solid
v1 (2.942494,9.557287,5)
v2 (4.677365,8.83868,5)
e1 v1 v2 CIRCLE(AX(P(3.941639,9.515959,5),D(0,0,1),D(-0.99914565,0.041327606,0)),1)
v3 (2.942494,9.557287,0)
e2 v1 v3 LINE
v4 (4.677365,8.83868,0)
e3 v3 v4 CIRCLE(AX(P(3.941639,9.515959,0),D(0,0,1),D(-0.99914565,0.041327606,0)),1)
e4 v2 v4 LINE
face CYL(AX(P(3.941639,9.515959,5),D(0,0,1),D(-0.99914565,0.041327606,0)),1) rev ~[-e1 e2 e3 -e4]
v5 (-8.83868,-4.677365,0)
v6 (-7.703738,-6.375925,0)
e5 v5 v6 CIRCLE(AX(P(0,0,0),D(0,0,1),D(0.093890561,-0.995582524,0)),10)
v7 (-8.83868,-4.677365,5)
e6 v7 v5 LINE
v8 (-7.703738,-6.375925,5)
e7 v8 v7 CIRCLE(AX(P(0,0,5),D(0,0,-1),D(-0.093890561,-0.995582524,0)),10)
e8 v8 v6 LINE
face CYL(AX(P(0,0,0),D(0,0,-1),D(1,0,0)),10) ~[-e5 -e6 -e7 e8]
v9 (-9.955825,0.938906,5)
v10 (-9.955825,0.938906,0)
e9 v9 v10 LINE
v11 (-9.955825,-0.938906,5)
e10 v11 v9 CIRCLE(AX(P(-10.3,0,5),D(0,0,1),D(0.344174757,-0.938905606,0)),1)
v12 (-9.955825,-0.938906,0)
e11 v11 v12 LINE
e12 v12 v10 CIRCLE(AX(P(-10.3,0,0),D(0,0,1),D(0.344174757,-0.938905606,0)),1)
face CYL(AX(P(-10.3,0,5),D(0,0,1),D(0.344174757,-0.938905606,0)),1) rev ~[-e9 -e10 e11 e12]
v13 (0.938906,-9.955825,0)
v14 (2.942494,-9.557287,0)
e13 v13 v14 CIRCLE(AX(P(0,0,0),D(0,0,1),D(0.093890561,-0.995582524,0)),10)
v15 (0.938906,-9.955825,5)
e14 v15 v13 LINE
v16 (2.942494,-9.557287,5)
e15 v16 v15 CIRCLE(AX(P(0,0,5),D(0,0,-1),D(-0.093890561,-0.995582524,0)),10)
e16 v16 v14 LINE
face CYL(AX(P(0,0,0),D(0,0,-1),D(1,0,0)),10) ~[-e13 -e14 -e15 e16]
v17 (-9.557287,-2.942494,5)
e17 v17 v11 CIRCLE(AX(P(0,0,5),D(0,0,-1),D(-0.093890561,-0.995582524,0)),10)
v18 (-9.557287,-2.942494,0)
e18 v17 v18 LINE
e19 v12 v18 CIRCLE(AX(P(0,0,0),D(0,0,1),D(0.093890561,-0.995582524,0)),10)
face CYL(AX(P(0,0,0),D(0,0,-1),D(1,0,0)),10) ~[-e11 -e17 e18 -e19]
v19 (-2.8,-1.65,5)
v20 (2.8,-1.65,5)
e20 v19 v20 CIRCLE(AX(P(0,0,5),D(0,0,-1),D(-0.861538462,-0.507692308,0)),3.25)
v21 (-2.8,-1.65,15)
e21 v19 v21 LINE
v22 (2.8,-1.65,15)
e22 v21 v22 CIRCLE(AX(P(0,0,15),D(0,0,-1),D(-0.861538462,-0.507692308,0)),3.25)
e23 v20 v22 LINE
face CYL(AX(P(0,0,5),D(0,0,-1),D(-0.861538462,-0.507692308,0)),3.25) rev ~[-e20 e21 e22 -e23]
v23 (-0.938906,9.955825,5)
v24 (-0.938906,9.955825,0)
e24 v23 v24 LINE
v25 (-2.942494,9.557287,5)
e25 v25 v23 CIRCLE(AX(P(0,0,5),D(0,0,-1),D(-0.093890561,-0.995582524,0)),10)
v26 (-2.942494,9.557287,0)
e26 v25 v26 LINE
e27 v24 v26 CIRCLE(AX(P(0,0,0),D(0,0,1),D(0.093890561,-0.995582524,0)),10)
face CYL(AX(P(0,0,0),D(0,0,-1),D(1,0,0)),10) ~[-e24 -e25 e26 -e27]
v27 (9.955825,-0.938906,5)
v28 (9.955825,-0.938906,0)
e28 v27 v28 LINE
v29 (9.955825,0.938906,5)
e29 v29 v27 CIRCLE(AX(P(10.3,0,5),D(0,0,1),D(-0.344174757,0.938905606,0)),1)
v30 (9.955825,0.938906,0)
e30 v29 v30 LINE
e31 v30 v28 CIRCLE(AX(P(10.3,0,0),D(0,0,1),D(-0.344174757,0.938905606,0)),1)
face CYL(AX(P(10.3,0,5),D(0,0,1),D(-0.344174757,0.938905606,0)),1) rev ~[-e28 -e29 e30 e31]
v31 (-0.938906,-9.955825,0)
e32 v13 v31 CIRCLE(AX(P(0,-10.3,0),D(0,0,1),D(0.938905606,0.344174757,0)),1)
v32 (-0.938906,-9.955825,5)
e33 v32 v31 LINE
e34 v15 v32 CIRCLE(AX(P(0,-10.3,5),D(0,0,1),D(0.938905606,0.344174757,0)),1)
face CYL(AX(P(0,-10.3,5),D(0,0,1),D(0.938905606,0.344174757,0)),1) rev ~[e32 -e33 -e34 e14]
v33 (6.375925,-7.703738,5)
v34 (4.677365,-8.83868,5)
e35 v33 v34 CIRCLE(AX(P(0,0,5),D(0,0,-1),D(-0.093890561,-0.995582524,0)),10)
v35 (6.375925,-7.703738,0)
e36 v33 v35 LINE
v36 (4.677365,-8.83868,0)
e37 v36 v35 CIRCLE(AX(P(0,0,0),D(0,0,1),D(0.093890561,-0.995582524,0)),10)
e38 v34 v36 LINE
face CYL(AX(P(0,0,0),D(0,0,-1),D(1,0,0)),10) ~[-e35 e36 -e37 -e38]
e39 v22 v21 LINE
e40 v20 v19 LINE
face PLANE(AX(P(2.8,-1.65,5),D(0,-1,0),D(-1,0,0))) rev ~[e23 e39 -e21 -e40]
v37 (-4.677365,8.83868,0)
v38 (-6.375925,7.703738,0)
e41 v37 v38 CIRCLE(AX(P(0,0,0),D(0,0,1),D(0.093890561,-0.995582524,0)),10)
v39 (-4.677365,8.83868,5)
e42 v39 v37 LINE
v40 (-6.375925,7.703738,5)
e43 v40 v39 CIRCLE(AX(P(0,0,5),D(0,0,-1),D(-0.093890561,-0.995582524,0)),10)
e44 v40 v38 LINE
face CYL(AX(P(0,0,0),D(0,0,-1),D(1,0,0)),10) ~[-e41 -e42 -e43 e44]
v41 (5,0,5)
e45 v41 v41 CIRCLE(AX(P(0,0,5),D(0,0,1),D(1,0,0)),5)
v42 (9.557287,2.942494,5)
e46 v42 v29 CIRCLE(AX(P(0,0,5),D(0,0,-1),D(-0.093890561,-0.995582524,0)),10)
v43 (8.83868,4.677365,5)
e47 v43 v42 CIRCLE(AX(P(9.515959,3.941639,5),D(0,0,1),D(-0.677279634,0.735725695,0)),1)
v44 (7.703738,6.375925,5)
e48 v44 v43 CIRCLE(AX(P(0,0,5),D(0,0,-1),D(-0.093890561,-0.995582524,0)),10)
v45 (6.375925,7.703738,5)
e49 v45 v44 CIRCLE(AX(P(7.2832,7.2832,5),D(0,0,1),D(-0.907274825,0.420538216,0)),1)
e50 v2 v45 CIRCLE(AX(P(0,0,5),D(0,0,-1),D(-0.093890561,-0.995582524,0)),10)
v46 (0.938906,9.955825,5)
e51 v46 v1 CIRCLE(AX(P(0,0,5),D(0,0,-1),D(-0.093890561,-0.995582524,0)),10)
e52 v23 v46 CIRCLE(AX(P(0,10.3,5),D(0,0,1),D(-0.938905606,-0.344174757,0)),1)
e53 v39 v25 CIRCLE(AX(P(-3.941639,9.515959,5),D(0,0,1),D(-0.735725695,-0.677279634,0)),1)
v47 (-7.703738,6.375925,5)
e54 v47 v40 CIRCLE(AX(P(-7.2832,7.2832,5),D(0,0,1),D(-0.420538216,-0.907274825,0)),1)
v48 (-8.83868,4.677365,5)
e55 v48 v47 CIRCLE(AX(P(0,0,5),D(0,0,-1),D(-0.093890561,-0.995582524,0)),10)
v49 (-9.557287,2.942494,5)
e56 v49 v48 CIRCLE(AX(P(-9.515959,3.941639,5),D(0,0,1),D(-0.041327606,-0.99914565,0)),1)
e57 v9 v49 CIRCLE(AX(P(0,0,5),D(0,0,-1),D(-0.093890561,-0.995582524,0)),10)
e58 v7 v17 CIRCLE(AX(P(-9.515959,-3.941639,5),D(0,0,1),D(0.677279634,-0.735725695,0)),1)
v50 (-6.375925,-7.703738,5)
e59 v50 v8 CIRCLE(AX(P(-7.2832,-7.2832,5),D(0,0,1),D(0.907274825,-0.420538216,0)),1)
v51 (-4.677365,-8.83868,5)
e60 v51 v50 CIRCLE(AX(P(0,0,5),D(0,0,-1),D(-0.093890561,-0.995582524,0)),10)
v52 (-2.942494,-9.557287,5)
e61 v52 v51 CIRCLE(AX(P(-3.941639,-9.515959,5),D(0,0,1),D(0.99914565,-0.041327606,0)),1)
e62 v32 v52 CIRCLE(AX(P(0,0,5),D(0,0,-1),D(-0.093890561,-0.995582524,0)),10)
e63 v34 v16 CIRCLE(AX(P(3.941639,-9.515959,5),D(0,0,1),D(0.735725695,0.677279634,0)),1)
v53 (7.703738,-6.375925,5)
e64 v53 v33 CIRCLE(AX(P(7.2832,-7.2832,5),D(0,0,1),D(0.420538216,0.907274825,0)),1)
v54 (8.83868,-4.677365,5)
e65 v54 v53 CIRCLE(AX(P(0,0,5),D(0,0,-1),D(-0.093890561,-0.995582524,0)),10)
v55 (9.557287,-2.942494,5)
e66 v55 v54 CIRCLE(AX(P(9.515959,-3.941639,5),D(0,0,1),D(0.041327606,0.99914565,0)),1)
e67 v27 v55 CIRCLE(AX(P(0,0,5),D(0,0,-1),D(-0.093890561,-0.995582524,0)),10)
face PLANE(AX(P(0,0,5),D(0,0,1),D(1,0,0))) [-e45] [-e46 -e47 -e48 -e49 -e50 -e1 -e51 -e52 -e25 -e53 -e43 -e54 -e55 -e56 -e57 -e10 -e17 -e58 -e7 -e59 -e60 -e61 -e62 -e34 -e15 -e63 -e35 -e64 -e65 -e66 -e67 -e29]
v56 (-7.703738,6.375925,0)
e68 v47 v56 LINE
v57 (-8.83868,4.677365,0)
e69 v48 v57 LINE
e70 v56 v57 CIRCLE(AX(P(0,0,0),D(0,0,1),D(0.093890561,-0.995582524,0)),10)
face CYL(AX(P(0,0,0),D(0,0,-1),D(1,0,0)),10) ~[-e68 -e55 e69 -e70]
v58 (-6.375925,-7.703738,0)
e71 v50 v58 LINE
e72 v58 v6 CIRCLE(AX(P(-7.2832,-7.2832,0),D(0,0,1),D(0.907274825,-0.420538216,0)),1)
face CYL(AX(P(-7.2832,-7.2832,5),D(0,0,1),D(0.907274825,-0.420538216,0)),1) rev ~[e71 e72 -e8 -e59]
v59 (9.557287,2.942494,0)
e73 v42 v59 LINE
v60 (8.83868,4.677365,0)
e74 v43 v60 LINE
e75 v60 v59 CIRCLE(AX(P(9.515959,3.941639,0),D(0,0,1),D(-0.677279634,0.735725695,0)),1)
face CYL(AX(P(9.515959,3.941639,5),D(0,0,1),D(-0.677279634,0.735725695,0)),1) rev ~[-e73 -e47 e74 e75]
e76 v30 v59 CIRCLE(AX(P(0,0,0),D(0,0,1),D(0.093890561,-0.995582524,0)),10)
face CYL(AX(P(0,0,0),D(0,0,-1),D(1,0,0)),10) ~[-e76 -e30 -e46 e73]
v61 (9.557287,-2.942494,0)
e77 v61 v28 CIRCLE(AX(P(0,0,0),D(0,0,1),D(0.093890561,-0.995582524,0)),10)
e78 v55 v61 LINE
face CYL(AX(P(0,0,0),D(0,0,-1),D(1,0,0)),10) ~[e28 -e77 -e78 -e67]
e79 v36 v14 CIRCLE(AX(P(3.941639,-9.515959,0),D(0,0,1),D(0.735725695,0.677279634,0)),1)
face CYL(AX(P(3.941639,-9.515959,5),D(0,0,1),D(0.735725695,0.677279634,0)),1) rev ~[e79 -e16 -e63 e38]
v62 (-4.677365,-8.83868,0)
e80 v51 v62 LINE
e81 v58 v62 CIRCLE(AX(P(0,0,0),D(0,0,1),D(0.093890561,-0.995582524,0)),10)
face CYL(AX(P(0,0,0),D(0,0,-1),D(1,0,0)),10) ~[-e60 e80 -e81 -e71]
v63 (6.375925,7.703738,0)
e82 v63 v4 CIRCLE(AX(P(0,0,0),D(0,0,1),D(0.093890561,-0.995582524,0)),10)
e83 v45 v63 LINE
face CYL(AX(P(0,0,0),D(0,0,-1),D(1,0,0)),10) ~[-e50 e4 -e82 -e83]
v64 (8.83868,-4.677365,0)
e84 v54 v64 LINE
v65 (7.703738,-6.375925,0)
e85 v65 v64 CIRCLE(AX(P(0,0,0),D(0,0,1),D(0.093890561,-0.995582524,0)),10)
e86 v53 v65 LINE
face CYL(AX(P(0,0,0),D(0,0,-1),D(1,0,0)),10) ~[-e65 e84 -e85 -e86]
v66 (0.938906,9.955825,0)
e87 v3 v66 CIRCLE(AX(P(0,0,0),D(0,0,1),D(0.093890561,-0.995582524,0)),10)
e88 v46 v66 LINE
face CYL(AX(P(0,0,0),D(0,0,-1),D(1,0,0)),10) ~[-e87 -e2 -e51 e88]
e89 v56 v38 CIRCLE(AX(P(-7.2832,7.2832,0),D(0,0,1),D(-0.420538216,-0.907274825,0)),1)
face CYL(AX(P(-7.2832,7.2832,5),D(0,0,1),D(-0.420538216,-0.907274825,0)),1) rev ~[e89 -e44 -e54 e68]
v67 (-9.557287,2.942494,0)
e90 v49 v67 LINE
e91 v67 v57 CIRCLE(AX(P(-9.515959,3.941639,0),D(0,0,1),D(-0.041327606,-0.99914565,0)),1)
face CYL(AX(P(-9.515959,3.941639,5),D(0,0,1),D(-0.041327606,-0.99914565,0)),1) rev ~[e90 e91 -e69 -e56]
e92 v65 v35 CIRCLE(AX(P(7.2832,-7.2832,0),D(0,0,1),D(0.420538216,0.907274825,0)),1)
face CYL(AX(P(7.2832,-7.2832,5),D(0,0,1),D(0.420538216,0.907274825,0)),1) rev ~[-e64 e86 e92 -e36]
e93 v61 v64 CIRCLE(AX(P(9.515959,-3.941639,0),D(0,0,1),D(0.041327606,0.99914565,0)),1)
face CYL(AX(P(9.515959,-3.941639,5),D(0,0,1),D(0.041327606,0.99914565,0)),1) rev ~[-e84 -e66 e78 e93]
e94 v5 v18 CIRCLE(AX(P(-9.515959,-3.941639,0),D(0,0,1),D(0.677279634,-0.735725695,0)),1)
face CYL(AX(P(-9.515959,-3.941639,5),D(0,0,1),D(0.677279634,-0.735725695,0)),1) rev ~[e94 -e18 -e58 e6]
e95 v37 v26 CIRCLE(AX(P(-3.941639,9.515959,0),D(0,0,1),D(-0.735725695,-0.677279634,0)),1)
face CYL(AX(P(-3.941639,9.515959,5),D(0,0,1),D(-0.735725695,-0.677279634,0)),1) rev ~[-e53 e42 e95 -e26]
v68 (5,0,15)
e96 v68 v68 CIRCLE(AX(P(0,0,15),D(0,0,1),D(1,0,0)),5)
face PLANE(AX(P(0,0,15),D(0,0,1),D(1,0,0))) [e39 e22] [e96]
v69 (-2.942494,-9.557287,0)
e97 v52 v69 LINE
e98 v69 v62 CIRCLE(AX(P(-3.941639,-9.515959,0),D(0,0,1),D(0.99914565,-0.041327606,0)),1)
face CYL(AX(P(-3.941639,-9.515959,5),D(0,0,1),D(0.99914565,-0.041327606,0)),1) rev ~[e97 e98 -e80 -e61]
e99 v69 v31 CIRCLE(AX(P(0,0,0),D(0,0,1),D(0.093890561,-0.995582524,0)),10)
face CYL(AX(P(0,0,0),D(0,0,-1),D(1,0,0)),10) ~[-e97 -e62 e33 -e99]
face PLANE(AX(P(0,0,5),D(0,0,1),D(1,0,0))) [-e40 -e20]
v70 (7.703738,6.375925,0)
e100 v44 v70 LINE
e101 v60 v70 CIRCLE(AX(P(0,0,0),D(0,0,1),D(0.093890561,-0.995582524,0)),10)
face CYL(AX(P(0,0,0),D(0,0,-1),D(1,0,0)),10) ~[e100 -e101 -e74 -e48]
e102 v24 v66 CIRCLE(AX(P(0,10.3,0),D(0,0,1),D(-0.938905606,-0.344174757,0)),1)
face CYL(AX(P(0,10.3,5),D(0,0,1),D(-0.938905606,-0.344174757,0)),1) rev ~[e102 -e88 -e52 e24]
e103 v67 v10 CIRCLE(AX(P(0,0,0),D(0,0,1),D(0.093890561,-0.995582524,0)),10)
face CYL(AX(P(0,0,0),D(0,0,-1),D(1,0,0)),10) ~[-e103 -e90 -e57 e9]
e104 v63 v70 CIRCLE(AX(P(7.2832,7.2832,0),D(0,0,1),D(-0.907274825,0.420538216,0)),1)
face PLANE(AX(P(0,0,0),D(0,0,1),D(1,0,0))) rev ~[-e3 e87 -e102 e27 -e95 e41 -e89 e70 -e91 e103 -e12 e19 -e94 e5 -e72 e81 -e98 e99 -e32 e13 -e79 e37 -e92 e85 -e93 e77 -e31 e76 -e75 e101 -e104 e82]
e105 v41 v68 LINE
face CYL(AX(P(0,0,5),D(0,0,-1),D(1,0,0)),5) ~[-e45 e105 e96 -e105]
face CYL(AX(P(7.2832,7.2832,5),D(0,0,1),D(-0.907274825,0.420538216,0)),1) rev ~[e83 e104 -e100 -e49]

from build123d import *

# Parameters (mm, degrees)
F0_R            = 10
F1_DEPTH        = 5
F3_DEPTH        = 25
F3_COPIES_COUNT = 16
F5_R            = 5
F6_DEPTH        = 10


# Not quite as in the source:
# - a pattern or mirror of a feature is missing from the dataset's text; its kind, count and spacing are read off the source's solid


with BuildPart() as f1:
    # F0 (on Top) → F1 (new body)
    with BuildSketch(Plane.XY):
        Circle(F0_R)
    extrude(amount=F1_DEPTH)

    # F2 (on face) → F3 (cut)
    with BuildSketch(Plane.XY.offset(5)):
        with BuildLine():
            ThreePointArc((-0.9389056057, -9.9558252427), (0, -10), (0.9389056057, -9.9558252427))
            ThreePointArc((0.9389056057, -9.9558252427), (0, -9.3), (-0.9389056057, -9.9558252427))
        make_face()
    f3 = extrude(amount=-F3_DEPTH, mode=Mode.SUBTRACT)

    # F3_copies: F3 ×16 about axis
    f3_copies_axis = Axis((0, 0, 0), (0, 0, 1))
    for i in range(1, F3_COPIES_COUNT):
        add(f3.rotate(f3_copies_axis, i * 360 / F3_COPIES_COUNT), mode=Mode.SUBTRACT)

    # F5 (on face) → F6 (join)
    with BuildSketch(Plane.XY.offset(5)):
        Circle(F5_R)
        with BuildLine():
            ThreePointArc((-2.8, -1.65), (0, 3.25), (2.8, -1.65))
            Line((2.8, -1.65), (-2.8, -1.65))
        make_face(mode=Mode.SUBTRACT)
    extrude(amount=F6_DEPTH)


solid = f1.part
